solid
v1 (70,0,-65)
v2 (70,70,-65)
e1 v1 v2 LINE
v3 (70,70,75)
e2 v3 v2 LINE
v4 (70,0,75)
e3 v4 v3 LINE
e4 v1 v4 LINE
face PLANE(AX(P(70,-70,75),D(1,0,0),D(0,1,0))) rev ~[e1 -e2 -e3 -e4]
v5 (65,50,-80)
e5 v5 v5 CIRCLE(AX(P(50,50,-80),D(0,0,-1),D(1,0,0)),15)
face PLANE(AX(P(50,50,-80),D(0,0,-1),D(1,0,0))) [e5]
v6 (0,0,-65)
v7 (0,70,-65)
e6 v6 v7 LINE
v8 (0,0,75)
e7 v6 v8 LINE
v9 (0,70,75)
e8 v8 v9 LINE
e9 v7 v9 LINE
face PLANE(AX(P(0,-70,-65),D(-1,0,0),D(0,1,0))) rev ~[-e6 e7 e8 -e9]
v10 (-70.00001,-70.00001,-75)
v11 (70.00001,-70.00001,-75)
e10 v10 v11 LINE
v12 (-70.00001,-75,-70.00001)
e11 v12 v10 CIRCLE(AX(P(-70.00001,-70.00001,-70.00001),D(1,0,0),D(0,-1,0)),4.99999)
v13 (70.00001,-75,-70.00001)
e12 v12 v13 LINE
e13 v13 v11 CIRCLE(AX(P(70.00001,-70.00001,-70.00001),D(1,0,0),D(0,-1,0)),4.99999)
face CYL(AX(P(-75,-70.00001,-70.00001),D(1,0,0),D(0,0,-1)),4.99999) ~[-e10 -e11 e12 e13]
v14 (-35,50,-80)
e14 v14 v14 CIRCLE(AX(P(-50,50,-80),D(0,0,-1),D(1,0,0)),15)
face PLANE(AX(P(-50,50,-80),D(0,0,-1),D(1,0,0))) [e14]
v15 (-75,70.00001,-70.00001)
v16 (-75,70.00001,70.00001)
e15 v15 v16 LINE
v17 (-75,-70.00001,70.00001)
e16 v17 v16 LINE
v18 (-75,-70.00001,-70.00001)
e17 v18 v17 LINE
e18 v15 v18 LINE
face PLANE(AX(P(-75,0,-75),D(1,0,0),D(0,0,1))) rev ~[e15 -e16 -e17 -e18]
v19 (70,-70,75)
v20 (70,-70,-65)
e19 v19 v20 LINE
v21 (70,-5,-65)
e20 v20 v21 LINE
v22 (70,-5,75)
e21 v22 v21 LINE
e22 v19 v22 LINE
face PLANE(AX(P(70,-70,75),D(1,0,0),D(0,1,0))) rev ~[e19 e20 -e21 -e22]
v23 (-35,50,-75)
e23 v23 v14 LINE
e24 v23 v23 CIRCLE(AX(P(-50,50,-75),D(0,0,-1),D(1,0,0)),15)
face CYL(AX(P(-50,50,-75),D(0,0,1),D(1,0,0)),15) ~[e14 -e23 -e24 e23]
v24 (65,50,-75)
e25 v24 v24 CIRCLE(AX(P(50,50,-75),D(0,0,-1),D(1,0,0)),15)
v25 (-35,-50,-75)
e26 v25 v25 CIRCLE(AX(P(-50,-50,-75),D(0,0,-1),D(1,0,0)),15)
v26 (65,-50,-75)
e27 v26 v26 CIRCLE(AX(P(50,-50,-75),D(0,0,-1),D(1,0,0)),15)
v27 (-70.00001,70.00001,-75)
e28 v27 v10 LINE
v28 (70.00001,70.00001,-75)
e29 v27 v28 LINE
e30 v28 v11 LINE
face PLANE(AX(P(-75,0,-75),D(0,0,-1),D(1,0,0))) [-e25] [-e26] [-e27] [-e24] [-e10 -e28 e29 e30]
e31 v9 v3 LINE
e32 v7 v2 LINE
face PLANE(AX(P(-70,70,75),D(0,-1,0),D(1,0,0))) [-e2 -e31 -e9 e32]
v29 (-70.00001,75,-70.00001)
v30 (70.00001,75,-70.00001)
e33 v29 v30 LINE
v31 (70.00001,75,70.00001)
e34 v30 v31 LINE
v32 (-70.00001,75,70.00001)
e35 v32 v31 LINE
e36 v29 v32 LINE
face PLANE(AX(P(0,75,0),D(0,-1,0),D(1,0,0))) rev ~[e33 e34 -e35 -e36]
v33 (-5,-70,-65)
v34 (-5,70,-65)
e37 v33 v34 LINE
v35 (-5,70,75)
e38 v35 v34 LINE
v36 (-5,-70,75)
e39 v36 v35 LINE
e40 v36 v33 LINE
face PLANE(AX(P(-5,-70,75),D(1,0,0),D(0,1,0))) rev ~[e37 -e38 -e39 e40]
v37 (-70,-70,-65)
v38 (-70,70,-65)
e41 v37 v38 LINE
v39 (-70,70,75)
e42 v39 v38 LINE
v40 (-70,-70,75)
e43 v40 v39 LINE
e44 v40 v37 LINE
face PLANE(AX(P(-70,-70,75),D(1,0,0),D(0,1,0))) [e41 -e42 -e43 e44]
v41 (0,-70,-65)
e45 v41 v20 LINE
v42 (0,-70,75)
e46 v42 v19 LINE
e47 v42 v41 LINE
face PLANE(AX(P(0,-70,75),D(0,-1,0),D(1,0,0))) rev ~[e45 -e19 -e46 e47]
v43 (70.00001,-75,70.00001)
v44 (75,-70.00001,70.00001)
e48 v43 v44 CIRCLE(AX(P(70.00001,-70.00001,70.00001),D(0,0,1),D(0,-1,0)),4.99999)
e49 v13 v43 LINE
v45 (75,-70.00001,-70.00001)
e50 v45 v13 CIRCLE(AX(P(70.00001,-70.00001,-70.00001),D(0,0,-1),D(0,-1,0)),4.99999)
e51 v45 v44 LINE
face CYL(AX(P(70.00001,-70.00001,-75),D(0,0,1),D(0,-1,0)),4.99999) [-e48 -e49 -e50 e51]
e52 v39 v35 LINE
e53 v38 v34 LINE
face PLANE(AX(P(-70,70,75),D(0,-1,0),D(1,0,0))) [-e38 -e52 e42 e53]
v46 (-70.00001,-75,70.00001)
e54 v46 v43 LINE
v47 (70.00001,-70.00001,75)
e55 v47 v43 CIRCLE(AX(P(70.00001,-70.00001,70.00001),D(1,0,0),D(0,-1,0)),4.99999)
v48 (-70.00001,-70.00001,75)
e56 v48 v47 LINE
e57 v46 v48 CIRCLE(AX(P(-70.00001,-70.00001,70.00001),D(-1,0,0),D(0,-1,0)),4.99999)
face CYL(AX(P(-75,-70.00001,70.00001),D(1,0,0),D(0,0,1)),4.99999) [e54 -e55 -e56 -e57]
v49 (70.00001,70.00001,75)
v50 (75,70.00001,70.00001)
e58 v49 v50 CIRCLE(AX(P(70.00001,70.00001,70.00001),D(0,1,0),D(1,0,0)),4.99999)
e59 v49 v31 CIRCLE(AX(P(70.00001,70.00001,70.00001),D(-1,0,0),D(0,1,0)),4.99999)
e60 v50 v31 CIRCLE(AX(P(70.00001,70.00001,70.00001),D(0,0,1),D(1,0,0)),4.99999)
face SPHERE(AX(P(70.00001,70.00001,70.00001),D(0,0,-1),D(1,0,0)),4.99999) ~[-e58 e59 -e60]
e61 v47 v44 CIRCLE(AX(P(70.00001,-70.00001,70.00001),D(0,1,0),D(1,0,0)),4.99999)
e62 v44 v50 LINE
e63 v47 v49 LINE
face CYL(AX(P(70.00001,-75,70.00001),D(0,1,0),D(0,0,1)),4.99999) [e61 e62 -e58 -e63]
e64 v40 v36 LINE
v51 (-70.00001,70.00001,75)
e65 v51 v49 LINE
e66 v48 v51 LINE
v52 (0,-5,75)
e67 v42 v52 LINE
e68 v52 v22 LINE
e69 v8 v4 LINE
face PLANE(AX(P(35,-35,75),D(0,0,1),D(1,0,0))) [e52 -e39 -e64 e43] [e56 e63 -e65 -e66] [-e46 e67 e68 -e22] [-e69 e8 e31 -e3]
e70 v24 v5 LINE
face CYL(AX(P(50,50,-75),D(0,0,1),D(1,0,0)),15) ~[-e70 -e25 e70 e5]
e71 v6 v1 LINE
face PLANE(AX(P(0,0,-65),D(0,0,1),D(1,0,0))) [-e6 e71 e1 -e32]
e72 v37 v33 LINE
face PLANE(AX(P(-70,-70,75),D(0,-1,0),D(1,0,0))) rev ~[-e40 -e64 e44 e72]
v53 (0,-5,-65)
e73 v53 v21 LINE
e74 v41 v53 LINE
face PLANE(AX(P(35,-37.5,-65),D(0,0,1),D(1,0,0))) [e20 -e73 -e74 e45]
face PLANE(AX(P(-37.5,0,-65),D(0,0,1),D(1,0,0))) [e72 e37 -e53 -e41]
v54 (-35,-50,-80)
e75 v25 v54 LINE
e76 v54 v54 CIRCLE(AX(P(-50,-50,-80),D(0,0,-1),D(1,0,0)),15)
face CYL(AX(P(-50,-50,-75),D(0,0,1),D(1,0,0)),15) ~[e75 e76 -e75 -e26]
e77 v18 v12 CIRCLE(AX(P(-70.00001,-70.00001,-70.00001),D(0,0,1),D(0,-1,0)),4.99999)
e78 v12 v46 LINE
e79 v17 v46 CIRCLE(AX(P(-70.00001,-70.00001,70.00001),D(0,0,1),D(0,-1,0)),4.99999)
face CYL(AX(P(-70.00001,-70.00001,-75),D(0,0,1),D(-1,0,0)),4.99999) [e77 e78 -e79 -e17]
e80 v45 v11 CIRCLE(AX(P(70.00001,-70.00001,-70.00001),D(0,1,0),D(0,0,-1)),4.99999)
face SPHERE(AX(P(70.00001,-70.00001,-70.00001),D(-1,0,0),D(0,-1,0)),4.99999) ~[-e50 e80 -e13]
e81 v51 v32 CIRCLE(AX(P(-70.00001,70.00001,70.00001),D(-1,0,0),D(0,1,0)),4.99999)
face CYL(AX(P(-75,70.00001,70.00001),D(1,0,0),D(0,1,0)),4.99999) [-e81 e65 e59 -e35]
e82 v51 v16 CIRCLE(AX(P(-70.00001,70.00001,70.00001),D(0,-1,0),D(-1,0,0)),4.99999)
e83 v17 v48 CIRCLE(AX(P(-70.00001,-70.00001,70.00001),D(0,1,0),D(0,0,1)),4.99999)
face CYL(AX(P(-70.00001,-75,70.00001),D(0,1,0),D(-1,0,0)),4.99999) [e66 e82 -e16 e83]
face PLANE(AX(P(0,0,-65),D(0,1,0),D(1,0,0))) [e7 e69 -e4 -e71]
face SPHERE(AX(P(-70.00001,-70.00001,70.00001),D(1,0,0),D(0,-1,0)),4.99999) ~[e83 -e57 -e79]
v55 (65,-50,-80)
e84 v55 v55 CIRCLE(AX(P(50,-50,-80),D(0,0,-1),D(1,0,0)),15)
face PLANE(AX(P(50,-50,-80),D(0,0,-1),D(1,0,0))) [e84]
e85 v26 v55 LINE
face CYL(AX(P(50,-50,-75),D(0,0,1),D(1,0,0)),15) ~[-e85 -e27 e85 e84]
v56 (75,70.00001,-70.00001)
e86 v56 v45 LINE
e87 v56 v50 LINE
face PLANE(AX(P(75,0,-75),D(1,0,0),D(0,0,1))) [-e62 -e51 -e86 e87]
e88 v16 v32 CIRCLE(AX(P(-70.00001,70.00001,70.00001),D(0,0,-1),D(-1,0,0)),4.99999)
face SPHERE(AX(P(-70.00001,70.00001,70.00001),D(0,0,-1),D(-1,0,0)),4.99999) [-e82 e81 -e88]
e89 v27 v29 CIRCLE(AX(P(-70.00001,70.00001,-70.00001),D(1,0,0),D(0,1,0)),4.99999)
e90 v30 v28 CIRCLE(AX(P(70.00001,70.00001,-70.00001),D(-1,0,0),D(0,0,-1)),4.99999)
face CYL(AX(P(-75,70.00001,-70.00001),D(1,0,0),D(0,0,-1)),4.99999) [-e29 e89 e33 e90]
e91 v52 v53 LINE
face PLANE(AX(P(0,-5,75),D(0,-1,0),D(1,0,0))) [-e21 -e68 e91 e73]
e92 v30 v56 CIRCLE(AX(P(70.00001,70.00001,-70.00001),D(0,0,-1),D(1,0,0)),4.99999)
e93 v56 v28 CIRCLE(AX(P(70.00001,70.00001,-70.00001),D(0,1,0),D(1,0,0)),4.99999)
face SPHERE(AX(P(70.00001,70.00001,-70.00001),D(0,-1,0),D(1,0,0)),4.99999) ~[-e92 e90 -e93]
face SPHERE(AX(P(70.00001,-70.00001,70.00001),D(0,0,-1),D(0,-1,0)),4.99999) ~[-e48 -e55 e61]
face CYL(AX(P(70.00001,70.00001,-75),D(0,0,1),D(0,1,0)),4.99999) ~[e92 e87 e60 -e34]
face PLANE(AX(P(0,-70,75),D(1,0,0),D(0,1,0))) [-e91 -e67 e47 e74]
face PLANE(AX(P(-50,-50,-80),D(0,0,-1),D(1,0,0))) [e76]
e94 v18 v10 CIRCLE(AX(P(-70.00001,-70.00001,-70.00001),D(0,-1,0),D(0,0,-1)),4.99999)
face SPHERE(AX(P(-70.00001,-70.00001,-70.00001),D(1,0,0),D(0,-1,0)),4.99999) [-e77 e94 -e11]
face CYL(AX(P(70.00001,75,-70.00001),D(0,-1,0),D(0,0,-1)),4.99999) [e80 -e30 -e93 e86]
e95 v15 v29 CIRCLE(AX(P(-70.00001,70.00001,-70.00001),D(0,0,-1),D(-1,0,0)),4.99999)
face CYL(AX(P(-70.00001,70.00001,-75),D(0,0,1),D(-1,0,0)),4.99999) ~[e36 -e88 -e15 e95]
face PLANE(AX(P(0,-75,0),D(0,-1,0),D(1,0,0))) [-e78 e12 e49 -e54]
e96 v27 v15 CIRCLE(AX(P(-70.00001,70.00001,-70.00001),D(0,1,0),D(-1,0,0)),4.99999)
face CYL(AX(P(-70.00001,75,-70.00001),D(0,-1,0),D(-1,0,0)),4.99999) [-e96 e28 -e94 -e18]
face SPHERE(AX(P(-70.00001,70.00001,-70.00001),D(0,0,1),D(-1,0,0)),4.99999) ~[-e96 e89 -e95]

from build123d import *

# Parameters (mm, degrees)
F0_W      = 150
F0_H      = 150
F1_DEPTH  = 75
F2_W      = 140
F2_H      = 140
F3_DEPTH  = 140
F4_R      = 4.99999
F5_W      = 70
F5_H      = 140
F6_DEPTH  = 140
F7_W      = 65
F7_H      = 140
F8_DEPTH  = 140
F9_W      = 70
F9_H      = 70
F10_DEPTH = 140
F11_W     = 70
F11_H     = 65
F12_DEPTH = 140
F13_R     = 15
F14_DEPTH = 5


# Not quite as in the source:
# - a fillet or chamfer is up to 0.001 mm smaller than in the source, because OpenCascade refuses the exact size


with BuildPart() as f1:
    # F0 (on Front) → F1 (new body, symmetric)
    with BuildSketch(Plane.XZ):
        Rectangle(F0_W, F0_H)
    extrude(amount=F1_DEPTH, both=True)

    # F2 (on face) → F3 (cut)
    with BuildSketch(Plane.XY.offset(75)):
        Rectangle(F2_W, F2_H)
    extrude(amount=-F3_DEPTH, mode=Mode.SUBTRACT)

    # F4 (radius 5 in the source; OpenCascade refuses exactly that, so slightly less here)
    f4_edges = [f1.edges().sort_by_distance(p)[0] for p in [
        (0, -75, -75),
        (75, -75, 0),
        (0, -75, 75),
        (-75, -75, 0),
        (75, 0, -75),
        (75, 75, 0),
        (75, 0, 75),
        (-75, 75, 0),
        (-75, 0, -75),
        (-75, 0, 75),
        (0, 75, -75),
        (0, 75, 75),
    ]]
    fillet(f4_edges, radius=F4_R)

    # F5 (on face) → F6 (join)
    with BuildSketch(Plane.XY.offset(-65)):
        with Locations((-35, 0)):
            Rectangle(F5_W, F5_H)
    extrude(amount=F6_DEPTH)

    # F7 (on face) → F8 (cut)
    with BuildSketch(Plane.XY.offset(75)):
        with Locations((-37.5, 0)):
            Rectangle(F7_W, F7_H)
    extrude(amount=-F8_DEPTH, mode=Mode.SUBTRACT)

    # F9 (on face) → F10 (join)
    with BuildSketch(Plane.XY.offset(-65)):
        with Locations((35, -35)):
            Rectangle(F9_W, F9_H)
    extrude(amount=F10_DEPTH)

    # F11 (on face) → F12 (cut)
    with BuildSketch(Plane.XY.offset(75)):
        with Locations((35, -37.5)):
            Rectangle(F11_W, F11_H)
    extrude(amount=-F12_DEPTH, mode=Mode.SUBTRACT)

    # F13 (on face) → F14 (join)
    with BuildSketch(Plane(origin=(0, 0, -75), x_dir=(1, 0, 0), z_dir=(0, 0, -1))):
        with Locations((-50, 50)):
            Circle(F13_R)
        with Locations((50, 50)):
            Circle(F13_R)
        with Locations((50, -50)):
            Circle(F13_R)
        with Locations((-50, -50)):
            Circle(F13_R)
    extrude(amount=F14_DEPTH)


solid = f1.part
